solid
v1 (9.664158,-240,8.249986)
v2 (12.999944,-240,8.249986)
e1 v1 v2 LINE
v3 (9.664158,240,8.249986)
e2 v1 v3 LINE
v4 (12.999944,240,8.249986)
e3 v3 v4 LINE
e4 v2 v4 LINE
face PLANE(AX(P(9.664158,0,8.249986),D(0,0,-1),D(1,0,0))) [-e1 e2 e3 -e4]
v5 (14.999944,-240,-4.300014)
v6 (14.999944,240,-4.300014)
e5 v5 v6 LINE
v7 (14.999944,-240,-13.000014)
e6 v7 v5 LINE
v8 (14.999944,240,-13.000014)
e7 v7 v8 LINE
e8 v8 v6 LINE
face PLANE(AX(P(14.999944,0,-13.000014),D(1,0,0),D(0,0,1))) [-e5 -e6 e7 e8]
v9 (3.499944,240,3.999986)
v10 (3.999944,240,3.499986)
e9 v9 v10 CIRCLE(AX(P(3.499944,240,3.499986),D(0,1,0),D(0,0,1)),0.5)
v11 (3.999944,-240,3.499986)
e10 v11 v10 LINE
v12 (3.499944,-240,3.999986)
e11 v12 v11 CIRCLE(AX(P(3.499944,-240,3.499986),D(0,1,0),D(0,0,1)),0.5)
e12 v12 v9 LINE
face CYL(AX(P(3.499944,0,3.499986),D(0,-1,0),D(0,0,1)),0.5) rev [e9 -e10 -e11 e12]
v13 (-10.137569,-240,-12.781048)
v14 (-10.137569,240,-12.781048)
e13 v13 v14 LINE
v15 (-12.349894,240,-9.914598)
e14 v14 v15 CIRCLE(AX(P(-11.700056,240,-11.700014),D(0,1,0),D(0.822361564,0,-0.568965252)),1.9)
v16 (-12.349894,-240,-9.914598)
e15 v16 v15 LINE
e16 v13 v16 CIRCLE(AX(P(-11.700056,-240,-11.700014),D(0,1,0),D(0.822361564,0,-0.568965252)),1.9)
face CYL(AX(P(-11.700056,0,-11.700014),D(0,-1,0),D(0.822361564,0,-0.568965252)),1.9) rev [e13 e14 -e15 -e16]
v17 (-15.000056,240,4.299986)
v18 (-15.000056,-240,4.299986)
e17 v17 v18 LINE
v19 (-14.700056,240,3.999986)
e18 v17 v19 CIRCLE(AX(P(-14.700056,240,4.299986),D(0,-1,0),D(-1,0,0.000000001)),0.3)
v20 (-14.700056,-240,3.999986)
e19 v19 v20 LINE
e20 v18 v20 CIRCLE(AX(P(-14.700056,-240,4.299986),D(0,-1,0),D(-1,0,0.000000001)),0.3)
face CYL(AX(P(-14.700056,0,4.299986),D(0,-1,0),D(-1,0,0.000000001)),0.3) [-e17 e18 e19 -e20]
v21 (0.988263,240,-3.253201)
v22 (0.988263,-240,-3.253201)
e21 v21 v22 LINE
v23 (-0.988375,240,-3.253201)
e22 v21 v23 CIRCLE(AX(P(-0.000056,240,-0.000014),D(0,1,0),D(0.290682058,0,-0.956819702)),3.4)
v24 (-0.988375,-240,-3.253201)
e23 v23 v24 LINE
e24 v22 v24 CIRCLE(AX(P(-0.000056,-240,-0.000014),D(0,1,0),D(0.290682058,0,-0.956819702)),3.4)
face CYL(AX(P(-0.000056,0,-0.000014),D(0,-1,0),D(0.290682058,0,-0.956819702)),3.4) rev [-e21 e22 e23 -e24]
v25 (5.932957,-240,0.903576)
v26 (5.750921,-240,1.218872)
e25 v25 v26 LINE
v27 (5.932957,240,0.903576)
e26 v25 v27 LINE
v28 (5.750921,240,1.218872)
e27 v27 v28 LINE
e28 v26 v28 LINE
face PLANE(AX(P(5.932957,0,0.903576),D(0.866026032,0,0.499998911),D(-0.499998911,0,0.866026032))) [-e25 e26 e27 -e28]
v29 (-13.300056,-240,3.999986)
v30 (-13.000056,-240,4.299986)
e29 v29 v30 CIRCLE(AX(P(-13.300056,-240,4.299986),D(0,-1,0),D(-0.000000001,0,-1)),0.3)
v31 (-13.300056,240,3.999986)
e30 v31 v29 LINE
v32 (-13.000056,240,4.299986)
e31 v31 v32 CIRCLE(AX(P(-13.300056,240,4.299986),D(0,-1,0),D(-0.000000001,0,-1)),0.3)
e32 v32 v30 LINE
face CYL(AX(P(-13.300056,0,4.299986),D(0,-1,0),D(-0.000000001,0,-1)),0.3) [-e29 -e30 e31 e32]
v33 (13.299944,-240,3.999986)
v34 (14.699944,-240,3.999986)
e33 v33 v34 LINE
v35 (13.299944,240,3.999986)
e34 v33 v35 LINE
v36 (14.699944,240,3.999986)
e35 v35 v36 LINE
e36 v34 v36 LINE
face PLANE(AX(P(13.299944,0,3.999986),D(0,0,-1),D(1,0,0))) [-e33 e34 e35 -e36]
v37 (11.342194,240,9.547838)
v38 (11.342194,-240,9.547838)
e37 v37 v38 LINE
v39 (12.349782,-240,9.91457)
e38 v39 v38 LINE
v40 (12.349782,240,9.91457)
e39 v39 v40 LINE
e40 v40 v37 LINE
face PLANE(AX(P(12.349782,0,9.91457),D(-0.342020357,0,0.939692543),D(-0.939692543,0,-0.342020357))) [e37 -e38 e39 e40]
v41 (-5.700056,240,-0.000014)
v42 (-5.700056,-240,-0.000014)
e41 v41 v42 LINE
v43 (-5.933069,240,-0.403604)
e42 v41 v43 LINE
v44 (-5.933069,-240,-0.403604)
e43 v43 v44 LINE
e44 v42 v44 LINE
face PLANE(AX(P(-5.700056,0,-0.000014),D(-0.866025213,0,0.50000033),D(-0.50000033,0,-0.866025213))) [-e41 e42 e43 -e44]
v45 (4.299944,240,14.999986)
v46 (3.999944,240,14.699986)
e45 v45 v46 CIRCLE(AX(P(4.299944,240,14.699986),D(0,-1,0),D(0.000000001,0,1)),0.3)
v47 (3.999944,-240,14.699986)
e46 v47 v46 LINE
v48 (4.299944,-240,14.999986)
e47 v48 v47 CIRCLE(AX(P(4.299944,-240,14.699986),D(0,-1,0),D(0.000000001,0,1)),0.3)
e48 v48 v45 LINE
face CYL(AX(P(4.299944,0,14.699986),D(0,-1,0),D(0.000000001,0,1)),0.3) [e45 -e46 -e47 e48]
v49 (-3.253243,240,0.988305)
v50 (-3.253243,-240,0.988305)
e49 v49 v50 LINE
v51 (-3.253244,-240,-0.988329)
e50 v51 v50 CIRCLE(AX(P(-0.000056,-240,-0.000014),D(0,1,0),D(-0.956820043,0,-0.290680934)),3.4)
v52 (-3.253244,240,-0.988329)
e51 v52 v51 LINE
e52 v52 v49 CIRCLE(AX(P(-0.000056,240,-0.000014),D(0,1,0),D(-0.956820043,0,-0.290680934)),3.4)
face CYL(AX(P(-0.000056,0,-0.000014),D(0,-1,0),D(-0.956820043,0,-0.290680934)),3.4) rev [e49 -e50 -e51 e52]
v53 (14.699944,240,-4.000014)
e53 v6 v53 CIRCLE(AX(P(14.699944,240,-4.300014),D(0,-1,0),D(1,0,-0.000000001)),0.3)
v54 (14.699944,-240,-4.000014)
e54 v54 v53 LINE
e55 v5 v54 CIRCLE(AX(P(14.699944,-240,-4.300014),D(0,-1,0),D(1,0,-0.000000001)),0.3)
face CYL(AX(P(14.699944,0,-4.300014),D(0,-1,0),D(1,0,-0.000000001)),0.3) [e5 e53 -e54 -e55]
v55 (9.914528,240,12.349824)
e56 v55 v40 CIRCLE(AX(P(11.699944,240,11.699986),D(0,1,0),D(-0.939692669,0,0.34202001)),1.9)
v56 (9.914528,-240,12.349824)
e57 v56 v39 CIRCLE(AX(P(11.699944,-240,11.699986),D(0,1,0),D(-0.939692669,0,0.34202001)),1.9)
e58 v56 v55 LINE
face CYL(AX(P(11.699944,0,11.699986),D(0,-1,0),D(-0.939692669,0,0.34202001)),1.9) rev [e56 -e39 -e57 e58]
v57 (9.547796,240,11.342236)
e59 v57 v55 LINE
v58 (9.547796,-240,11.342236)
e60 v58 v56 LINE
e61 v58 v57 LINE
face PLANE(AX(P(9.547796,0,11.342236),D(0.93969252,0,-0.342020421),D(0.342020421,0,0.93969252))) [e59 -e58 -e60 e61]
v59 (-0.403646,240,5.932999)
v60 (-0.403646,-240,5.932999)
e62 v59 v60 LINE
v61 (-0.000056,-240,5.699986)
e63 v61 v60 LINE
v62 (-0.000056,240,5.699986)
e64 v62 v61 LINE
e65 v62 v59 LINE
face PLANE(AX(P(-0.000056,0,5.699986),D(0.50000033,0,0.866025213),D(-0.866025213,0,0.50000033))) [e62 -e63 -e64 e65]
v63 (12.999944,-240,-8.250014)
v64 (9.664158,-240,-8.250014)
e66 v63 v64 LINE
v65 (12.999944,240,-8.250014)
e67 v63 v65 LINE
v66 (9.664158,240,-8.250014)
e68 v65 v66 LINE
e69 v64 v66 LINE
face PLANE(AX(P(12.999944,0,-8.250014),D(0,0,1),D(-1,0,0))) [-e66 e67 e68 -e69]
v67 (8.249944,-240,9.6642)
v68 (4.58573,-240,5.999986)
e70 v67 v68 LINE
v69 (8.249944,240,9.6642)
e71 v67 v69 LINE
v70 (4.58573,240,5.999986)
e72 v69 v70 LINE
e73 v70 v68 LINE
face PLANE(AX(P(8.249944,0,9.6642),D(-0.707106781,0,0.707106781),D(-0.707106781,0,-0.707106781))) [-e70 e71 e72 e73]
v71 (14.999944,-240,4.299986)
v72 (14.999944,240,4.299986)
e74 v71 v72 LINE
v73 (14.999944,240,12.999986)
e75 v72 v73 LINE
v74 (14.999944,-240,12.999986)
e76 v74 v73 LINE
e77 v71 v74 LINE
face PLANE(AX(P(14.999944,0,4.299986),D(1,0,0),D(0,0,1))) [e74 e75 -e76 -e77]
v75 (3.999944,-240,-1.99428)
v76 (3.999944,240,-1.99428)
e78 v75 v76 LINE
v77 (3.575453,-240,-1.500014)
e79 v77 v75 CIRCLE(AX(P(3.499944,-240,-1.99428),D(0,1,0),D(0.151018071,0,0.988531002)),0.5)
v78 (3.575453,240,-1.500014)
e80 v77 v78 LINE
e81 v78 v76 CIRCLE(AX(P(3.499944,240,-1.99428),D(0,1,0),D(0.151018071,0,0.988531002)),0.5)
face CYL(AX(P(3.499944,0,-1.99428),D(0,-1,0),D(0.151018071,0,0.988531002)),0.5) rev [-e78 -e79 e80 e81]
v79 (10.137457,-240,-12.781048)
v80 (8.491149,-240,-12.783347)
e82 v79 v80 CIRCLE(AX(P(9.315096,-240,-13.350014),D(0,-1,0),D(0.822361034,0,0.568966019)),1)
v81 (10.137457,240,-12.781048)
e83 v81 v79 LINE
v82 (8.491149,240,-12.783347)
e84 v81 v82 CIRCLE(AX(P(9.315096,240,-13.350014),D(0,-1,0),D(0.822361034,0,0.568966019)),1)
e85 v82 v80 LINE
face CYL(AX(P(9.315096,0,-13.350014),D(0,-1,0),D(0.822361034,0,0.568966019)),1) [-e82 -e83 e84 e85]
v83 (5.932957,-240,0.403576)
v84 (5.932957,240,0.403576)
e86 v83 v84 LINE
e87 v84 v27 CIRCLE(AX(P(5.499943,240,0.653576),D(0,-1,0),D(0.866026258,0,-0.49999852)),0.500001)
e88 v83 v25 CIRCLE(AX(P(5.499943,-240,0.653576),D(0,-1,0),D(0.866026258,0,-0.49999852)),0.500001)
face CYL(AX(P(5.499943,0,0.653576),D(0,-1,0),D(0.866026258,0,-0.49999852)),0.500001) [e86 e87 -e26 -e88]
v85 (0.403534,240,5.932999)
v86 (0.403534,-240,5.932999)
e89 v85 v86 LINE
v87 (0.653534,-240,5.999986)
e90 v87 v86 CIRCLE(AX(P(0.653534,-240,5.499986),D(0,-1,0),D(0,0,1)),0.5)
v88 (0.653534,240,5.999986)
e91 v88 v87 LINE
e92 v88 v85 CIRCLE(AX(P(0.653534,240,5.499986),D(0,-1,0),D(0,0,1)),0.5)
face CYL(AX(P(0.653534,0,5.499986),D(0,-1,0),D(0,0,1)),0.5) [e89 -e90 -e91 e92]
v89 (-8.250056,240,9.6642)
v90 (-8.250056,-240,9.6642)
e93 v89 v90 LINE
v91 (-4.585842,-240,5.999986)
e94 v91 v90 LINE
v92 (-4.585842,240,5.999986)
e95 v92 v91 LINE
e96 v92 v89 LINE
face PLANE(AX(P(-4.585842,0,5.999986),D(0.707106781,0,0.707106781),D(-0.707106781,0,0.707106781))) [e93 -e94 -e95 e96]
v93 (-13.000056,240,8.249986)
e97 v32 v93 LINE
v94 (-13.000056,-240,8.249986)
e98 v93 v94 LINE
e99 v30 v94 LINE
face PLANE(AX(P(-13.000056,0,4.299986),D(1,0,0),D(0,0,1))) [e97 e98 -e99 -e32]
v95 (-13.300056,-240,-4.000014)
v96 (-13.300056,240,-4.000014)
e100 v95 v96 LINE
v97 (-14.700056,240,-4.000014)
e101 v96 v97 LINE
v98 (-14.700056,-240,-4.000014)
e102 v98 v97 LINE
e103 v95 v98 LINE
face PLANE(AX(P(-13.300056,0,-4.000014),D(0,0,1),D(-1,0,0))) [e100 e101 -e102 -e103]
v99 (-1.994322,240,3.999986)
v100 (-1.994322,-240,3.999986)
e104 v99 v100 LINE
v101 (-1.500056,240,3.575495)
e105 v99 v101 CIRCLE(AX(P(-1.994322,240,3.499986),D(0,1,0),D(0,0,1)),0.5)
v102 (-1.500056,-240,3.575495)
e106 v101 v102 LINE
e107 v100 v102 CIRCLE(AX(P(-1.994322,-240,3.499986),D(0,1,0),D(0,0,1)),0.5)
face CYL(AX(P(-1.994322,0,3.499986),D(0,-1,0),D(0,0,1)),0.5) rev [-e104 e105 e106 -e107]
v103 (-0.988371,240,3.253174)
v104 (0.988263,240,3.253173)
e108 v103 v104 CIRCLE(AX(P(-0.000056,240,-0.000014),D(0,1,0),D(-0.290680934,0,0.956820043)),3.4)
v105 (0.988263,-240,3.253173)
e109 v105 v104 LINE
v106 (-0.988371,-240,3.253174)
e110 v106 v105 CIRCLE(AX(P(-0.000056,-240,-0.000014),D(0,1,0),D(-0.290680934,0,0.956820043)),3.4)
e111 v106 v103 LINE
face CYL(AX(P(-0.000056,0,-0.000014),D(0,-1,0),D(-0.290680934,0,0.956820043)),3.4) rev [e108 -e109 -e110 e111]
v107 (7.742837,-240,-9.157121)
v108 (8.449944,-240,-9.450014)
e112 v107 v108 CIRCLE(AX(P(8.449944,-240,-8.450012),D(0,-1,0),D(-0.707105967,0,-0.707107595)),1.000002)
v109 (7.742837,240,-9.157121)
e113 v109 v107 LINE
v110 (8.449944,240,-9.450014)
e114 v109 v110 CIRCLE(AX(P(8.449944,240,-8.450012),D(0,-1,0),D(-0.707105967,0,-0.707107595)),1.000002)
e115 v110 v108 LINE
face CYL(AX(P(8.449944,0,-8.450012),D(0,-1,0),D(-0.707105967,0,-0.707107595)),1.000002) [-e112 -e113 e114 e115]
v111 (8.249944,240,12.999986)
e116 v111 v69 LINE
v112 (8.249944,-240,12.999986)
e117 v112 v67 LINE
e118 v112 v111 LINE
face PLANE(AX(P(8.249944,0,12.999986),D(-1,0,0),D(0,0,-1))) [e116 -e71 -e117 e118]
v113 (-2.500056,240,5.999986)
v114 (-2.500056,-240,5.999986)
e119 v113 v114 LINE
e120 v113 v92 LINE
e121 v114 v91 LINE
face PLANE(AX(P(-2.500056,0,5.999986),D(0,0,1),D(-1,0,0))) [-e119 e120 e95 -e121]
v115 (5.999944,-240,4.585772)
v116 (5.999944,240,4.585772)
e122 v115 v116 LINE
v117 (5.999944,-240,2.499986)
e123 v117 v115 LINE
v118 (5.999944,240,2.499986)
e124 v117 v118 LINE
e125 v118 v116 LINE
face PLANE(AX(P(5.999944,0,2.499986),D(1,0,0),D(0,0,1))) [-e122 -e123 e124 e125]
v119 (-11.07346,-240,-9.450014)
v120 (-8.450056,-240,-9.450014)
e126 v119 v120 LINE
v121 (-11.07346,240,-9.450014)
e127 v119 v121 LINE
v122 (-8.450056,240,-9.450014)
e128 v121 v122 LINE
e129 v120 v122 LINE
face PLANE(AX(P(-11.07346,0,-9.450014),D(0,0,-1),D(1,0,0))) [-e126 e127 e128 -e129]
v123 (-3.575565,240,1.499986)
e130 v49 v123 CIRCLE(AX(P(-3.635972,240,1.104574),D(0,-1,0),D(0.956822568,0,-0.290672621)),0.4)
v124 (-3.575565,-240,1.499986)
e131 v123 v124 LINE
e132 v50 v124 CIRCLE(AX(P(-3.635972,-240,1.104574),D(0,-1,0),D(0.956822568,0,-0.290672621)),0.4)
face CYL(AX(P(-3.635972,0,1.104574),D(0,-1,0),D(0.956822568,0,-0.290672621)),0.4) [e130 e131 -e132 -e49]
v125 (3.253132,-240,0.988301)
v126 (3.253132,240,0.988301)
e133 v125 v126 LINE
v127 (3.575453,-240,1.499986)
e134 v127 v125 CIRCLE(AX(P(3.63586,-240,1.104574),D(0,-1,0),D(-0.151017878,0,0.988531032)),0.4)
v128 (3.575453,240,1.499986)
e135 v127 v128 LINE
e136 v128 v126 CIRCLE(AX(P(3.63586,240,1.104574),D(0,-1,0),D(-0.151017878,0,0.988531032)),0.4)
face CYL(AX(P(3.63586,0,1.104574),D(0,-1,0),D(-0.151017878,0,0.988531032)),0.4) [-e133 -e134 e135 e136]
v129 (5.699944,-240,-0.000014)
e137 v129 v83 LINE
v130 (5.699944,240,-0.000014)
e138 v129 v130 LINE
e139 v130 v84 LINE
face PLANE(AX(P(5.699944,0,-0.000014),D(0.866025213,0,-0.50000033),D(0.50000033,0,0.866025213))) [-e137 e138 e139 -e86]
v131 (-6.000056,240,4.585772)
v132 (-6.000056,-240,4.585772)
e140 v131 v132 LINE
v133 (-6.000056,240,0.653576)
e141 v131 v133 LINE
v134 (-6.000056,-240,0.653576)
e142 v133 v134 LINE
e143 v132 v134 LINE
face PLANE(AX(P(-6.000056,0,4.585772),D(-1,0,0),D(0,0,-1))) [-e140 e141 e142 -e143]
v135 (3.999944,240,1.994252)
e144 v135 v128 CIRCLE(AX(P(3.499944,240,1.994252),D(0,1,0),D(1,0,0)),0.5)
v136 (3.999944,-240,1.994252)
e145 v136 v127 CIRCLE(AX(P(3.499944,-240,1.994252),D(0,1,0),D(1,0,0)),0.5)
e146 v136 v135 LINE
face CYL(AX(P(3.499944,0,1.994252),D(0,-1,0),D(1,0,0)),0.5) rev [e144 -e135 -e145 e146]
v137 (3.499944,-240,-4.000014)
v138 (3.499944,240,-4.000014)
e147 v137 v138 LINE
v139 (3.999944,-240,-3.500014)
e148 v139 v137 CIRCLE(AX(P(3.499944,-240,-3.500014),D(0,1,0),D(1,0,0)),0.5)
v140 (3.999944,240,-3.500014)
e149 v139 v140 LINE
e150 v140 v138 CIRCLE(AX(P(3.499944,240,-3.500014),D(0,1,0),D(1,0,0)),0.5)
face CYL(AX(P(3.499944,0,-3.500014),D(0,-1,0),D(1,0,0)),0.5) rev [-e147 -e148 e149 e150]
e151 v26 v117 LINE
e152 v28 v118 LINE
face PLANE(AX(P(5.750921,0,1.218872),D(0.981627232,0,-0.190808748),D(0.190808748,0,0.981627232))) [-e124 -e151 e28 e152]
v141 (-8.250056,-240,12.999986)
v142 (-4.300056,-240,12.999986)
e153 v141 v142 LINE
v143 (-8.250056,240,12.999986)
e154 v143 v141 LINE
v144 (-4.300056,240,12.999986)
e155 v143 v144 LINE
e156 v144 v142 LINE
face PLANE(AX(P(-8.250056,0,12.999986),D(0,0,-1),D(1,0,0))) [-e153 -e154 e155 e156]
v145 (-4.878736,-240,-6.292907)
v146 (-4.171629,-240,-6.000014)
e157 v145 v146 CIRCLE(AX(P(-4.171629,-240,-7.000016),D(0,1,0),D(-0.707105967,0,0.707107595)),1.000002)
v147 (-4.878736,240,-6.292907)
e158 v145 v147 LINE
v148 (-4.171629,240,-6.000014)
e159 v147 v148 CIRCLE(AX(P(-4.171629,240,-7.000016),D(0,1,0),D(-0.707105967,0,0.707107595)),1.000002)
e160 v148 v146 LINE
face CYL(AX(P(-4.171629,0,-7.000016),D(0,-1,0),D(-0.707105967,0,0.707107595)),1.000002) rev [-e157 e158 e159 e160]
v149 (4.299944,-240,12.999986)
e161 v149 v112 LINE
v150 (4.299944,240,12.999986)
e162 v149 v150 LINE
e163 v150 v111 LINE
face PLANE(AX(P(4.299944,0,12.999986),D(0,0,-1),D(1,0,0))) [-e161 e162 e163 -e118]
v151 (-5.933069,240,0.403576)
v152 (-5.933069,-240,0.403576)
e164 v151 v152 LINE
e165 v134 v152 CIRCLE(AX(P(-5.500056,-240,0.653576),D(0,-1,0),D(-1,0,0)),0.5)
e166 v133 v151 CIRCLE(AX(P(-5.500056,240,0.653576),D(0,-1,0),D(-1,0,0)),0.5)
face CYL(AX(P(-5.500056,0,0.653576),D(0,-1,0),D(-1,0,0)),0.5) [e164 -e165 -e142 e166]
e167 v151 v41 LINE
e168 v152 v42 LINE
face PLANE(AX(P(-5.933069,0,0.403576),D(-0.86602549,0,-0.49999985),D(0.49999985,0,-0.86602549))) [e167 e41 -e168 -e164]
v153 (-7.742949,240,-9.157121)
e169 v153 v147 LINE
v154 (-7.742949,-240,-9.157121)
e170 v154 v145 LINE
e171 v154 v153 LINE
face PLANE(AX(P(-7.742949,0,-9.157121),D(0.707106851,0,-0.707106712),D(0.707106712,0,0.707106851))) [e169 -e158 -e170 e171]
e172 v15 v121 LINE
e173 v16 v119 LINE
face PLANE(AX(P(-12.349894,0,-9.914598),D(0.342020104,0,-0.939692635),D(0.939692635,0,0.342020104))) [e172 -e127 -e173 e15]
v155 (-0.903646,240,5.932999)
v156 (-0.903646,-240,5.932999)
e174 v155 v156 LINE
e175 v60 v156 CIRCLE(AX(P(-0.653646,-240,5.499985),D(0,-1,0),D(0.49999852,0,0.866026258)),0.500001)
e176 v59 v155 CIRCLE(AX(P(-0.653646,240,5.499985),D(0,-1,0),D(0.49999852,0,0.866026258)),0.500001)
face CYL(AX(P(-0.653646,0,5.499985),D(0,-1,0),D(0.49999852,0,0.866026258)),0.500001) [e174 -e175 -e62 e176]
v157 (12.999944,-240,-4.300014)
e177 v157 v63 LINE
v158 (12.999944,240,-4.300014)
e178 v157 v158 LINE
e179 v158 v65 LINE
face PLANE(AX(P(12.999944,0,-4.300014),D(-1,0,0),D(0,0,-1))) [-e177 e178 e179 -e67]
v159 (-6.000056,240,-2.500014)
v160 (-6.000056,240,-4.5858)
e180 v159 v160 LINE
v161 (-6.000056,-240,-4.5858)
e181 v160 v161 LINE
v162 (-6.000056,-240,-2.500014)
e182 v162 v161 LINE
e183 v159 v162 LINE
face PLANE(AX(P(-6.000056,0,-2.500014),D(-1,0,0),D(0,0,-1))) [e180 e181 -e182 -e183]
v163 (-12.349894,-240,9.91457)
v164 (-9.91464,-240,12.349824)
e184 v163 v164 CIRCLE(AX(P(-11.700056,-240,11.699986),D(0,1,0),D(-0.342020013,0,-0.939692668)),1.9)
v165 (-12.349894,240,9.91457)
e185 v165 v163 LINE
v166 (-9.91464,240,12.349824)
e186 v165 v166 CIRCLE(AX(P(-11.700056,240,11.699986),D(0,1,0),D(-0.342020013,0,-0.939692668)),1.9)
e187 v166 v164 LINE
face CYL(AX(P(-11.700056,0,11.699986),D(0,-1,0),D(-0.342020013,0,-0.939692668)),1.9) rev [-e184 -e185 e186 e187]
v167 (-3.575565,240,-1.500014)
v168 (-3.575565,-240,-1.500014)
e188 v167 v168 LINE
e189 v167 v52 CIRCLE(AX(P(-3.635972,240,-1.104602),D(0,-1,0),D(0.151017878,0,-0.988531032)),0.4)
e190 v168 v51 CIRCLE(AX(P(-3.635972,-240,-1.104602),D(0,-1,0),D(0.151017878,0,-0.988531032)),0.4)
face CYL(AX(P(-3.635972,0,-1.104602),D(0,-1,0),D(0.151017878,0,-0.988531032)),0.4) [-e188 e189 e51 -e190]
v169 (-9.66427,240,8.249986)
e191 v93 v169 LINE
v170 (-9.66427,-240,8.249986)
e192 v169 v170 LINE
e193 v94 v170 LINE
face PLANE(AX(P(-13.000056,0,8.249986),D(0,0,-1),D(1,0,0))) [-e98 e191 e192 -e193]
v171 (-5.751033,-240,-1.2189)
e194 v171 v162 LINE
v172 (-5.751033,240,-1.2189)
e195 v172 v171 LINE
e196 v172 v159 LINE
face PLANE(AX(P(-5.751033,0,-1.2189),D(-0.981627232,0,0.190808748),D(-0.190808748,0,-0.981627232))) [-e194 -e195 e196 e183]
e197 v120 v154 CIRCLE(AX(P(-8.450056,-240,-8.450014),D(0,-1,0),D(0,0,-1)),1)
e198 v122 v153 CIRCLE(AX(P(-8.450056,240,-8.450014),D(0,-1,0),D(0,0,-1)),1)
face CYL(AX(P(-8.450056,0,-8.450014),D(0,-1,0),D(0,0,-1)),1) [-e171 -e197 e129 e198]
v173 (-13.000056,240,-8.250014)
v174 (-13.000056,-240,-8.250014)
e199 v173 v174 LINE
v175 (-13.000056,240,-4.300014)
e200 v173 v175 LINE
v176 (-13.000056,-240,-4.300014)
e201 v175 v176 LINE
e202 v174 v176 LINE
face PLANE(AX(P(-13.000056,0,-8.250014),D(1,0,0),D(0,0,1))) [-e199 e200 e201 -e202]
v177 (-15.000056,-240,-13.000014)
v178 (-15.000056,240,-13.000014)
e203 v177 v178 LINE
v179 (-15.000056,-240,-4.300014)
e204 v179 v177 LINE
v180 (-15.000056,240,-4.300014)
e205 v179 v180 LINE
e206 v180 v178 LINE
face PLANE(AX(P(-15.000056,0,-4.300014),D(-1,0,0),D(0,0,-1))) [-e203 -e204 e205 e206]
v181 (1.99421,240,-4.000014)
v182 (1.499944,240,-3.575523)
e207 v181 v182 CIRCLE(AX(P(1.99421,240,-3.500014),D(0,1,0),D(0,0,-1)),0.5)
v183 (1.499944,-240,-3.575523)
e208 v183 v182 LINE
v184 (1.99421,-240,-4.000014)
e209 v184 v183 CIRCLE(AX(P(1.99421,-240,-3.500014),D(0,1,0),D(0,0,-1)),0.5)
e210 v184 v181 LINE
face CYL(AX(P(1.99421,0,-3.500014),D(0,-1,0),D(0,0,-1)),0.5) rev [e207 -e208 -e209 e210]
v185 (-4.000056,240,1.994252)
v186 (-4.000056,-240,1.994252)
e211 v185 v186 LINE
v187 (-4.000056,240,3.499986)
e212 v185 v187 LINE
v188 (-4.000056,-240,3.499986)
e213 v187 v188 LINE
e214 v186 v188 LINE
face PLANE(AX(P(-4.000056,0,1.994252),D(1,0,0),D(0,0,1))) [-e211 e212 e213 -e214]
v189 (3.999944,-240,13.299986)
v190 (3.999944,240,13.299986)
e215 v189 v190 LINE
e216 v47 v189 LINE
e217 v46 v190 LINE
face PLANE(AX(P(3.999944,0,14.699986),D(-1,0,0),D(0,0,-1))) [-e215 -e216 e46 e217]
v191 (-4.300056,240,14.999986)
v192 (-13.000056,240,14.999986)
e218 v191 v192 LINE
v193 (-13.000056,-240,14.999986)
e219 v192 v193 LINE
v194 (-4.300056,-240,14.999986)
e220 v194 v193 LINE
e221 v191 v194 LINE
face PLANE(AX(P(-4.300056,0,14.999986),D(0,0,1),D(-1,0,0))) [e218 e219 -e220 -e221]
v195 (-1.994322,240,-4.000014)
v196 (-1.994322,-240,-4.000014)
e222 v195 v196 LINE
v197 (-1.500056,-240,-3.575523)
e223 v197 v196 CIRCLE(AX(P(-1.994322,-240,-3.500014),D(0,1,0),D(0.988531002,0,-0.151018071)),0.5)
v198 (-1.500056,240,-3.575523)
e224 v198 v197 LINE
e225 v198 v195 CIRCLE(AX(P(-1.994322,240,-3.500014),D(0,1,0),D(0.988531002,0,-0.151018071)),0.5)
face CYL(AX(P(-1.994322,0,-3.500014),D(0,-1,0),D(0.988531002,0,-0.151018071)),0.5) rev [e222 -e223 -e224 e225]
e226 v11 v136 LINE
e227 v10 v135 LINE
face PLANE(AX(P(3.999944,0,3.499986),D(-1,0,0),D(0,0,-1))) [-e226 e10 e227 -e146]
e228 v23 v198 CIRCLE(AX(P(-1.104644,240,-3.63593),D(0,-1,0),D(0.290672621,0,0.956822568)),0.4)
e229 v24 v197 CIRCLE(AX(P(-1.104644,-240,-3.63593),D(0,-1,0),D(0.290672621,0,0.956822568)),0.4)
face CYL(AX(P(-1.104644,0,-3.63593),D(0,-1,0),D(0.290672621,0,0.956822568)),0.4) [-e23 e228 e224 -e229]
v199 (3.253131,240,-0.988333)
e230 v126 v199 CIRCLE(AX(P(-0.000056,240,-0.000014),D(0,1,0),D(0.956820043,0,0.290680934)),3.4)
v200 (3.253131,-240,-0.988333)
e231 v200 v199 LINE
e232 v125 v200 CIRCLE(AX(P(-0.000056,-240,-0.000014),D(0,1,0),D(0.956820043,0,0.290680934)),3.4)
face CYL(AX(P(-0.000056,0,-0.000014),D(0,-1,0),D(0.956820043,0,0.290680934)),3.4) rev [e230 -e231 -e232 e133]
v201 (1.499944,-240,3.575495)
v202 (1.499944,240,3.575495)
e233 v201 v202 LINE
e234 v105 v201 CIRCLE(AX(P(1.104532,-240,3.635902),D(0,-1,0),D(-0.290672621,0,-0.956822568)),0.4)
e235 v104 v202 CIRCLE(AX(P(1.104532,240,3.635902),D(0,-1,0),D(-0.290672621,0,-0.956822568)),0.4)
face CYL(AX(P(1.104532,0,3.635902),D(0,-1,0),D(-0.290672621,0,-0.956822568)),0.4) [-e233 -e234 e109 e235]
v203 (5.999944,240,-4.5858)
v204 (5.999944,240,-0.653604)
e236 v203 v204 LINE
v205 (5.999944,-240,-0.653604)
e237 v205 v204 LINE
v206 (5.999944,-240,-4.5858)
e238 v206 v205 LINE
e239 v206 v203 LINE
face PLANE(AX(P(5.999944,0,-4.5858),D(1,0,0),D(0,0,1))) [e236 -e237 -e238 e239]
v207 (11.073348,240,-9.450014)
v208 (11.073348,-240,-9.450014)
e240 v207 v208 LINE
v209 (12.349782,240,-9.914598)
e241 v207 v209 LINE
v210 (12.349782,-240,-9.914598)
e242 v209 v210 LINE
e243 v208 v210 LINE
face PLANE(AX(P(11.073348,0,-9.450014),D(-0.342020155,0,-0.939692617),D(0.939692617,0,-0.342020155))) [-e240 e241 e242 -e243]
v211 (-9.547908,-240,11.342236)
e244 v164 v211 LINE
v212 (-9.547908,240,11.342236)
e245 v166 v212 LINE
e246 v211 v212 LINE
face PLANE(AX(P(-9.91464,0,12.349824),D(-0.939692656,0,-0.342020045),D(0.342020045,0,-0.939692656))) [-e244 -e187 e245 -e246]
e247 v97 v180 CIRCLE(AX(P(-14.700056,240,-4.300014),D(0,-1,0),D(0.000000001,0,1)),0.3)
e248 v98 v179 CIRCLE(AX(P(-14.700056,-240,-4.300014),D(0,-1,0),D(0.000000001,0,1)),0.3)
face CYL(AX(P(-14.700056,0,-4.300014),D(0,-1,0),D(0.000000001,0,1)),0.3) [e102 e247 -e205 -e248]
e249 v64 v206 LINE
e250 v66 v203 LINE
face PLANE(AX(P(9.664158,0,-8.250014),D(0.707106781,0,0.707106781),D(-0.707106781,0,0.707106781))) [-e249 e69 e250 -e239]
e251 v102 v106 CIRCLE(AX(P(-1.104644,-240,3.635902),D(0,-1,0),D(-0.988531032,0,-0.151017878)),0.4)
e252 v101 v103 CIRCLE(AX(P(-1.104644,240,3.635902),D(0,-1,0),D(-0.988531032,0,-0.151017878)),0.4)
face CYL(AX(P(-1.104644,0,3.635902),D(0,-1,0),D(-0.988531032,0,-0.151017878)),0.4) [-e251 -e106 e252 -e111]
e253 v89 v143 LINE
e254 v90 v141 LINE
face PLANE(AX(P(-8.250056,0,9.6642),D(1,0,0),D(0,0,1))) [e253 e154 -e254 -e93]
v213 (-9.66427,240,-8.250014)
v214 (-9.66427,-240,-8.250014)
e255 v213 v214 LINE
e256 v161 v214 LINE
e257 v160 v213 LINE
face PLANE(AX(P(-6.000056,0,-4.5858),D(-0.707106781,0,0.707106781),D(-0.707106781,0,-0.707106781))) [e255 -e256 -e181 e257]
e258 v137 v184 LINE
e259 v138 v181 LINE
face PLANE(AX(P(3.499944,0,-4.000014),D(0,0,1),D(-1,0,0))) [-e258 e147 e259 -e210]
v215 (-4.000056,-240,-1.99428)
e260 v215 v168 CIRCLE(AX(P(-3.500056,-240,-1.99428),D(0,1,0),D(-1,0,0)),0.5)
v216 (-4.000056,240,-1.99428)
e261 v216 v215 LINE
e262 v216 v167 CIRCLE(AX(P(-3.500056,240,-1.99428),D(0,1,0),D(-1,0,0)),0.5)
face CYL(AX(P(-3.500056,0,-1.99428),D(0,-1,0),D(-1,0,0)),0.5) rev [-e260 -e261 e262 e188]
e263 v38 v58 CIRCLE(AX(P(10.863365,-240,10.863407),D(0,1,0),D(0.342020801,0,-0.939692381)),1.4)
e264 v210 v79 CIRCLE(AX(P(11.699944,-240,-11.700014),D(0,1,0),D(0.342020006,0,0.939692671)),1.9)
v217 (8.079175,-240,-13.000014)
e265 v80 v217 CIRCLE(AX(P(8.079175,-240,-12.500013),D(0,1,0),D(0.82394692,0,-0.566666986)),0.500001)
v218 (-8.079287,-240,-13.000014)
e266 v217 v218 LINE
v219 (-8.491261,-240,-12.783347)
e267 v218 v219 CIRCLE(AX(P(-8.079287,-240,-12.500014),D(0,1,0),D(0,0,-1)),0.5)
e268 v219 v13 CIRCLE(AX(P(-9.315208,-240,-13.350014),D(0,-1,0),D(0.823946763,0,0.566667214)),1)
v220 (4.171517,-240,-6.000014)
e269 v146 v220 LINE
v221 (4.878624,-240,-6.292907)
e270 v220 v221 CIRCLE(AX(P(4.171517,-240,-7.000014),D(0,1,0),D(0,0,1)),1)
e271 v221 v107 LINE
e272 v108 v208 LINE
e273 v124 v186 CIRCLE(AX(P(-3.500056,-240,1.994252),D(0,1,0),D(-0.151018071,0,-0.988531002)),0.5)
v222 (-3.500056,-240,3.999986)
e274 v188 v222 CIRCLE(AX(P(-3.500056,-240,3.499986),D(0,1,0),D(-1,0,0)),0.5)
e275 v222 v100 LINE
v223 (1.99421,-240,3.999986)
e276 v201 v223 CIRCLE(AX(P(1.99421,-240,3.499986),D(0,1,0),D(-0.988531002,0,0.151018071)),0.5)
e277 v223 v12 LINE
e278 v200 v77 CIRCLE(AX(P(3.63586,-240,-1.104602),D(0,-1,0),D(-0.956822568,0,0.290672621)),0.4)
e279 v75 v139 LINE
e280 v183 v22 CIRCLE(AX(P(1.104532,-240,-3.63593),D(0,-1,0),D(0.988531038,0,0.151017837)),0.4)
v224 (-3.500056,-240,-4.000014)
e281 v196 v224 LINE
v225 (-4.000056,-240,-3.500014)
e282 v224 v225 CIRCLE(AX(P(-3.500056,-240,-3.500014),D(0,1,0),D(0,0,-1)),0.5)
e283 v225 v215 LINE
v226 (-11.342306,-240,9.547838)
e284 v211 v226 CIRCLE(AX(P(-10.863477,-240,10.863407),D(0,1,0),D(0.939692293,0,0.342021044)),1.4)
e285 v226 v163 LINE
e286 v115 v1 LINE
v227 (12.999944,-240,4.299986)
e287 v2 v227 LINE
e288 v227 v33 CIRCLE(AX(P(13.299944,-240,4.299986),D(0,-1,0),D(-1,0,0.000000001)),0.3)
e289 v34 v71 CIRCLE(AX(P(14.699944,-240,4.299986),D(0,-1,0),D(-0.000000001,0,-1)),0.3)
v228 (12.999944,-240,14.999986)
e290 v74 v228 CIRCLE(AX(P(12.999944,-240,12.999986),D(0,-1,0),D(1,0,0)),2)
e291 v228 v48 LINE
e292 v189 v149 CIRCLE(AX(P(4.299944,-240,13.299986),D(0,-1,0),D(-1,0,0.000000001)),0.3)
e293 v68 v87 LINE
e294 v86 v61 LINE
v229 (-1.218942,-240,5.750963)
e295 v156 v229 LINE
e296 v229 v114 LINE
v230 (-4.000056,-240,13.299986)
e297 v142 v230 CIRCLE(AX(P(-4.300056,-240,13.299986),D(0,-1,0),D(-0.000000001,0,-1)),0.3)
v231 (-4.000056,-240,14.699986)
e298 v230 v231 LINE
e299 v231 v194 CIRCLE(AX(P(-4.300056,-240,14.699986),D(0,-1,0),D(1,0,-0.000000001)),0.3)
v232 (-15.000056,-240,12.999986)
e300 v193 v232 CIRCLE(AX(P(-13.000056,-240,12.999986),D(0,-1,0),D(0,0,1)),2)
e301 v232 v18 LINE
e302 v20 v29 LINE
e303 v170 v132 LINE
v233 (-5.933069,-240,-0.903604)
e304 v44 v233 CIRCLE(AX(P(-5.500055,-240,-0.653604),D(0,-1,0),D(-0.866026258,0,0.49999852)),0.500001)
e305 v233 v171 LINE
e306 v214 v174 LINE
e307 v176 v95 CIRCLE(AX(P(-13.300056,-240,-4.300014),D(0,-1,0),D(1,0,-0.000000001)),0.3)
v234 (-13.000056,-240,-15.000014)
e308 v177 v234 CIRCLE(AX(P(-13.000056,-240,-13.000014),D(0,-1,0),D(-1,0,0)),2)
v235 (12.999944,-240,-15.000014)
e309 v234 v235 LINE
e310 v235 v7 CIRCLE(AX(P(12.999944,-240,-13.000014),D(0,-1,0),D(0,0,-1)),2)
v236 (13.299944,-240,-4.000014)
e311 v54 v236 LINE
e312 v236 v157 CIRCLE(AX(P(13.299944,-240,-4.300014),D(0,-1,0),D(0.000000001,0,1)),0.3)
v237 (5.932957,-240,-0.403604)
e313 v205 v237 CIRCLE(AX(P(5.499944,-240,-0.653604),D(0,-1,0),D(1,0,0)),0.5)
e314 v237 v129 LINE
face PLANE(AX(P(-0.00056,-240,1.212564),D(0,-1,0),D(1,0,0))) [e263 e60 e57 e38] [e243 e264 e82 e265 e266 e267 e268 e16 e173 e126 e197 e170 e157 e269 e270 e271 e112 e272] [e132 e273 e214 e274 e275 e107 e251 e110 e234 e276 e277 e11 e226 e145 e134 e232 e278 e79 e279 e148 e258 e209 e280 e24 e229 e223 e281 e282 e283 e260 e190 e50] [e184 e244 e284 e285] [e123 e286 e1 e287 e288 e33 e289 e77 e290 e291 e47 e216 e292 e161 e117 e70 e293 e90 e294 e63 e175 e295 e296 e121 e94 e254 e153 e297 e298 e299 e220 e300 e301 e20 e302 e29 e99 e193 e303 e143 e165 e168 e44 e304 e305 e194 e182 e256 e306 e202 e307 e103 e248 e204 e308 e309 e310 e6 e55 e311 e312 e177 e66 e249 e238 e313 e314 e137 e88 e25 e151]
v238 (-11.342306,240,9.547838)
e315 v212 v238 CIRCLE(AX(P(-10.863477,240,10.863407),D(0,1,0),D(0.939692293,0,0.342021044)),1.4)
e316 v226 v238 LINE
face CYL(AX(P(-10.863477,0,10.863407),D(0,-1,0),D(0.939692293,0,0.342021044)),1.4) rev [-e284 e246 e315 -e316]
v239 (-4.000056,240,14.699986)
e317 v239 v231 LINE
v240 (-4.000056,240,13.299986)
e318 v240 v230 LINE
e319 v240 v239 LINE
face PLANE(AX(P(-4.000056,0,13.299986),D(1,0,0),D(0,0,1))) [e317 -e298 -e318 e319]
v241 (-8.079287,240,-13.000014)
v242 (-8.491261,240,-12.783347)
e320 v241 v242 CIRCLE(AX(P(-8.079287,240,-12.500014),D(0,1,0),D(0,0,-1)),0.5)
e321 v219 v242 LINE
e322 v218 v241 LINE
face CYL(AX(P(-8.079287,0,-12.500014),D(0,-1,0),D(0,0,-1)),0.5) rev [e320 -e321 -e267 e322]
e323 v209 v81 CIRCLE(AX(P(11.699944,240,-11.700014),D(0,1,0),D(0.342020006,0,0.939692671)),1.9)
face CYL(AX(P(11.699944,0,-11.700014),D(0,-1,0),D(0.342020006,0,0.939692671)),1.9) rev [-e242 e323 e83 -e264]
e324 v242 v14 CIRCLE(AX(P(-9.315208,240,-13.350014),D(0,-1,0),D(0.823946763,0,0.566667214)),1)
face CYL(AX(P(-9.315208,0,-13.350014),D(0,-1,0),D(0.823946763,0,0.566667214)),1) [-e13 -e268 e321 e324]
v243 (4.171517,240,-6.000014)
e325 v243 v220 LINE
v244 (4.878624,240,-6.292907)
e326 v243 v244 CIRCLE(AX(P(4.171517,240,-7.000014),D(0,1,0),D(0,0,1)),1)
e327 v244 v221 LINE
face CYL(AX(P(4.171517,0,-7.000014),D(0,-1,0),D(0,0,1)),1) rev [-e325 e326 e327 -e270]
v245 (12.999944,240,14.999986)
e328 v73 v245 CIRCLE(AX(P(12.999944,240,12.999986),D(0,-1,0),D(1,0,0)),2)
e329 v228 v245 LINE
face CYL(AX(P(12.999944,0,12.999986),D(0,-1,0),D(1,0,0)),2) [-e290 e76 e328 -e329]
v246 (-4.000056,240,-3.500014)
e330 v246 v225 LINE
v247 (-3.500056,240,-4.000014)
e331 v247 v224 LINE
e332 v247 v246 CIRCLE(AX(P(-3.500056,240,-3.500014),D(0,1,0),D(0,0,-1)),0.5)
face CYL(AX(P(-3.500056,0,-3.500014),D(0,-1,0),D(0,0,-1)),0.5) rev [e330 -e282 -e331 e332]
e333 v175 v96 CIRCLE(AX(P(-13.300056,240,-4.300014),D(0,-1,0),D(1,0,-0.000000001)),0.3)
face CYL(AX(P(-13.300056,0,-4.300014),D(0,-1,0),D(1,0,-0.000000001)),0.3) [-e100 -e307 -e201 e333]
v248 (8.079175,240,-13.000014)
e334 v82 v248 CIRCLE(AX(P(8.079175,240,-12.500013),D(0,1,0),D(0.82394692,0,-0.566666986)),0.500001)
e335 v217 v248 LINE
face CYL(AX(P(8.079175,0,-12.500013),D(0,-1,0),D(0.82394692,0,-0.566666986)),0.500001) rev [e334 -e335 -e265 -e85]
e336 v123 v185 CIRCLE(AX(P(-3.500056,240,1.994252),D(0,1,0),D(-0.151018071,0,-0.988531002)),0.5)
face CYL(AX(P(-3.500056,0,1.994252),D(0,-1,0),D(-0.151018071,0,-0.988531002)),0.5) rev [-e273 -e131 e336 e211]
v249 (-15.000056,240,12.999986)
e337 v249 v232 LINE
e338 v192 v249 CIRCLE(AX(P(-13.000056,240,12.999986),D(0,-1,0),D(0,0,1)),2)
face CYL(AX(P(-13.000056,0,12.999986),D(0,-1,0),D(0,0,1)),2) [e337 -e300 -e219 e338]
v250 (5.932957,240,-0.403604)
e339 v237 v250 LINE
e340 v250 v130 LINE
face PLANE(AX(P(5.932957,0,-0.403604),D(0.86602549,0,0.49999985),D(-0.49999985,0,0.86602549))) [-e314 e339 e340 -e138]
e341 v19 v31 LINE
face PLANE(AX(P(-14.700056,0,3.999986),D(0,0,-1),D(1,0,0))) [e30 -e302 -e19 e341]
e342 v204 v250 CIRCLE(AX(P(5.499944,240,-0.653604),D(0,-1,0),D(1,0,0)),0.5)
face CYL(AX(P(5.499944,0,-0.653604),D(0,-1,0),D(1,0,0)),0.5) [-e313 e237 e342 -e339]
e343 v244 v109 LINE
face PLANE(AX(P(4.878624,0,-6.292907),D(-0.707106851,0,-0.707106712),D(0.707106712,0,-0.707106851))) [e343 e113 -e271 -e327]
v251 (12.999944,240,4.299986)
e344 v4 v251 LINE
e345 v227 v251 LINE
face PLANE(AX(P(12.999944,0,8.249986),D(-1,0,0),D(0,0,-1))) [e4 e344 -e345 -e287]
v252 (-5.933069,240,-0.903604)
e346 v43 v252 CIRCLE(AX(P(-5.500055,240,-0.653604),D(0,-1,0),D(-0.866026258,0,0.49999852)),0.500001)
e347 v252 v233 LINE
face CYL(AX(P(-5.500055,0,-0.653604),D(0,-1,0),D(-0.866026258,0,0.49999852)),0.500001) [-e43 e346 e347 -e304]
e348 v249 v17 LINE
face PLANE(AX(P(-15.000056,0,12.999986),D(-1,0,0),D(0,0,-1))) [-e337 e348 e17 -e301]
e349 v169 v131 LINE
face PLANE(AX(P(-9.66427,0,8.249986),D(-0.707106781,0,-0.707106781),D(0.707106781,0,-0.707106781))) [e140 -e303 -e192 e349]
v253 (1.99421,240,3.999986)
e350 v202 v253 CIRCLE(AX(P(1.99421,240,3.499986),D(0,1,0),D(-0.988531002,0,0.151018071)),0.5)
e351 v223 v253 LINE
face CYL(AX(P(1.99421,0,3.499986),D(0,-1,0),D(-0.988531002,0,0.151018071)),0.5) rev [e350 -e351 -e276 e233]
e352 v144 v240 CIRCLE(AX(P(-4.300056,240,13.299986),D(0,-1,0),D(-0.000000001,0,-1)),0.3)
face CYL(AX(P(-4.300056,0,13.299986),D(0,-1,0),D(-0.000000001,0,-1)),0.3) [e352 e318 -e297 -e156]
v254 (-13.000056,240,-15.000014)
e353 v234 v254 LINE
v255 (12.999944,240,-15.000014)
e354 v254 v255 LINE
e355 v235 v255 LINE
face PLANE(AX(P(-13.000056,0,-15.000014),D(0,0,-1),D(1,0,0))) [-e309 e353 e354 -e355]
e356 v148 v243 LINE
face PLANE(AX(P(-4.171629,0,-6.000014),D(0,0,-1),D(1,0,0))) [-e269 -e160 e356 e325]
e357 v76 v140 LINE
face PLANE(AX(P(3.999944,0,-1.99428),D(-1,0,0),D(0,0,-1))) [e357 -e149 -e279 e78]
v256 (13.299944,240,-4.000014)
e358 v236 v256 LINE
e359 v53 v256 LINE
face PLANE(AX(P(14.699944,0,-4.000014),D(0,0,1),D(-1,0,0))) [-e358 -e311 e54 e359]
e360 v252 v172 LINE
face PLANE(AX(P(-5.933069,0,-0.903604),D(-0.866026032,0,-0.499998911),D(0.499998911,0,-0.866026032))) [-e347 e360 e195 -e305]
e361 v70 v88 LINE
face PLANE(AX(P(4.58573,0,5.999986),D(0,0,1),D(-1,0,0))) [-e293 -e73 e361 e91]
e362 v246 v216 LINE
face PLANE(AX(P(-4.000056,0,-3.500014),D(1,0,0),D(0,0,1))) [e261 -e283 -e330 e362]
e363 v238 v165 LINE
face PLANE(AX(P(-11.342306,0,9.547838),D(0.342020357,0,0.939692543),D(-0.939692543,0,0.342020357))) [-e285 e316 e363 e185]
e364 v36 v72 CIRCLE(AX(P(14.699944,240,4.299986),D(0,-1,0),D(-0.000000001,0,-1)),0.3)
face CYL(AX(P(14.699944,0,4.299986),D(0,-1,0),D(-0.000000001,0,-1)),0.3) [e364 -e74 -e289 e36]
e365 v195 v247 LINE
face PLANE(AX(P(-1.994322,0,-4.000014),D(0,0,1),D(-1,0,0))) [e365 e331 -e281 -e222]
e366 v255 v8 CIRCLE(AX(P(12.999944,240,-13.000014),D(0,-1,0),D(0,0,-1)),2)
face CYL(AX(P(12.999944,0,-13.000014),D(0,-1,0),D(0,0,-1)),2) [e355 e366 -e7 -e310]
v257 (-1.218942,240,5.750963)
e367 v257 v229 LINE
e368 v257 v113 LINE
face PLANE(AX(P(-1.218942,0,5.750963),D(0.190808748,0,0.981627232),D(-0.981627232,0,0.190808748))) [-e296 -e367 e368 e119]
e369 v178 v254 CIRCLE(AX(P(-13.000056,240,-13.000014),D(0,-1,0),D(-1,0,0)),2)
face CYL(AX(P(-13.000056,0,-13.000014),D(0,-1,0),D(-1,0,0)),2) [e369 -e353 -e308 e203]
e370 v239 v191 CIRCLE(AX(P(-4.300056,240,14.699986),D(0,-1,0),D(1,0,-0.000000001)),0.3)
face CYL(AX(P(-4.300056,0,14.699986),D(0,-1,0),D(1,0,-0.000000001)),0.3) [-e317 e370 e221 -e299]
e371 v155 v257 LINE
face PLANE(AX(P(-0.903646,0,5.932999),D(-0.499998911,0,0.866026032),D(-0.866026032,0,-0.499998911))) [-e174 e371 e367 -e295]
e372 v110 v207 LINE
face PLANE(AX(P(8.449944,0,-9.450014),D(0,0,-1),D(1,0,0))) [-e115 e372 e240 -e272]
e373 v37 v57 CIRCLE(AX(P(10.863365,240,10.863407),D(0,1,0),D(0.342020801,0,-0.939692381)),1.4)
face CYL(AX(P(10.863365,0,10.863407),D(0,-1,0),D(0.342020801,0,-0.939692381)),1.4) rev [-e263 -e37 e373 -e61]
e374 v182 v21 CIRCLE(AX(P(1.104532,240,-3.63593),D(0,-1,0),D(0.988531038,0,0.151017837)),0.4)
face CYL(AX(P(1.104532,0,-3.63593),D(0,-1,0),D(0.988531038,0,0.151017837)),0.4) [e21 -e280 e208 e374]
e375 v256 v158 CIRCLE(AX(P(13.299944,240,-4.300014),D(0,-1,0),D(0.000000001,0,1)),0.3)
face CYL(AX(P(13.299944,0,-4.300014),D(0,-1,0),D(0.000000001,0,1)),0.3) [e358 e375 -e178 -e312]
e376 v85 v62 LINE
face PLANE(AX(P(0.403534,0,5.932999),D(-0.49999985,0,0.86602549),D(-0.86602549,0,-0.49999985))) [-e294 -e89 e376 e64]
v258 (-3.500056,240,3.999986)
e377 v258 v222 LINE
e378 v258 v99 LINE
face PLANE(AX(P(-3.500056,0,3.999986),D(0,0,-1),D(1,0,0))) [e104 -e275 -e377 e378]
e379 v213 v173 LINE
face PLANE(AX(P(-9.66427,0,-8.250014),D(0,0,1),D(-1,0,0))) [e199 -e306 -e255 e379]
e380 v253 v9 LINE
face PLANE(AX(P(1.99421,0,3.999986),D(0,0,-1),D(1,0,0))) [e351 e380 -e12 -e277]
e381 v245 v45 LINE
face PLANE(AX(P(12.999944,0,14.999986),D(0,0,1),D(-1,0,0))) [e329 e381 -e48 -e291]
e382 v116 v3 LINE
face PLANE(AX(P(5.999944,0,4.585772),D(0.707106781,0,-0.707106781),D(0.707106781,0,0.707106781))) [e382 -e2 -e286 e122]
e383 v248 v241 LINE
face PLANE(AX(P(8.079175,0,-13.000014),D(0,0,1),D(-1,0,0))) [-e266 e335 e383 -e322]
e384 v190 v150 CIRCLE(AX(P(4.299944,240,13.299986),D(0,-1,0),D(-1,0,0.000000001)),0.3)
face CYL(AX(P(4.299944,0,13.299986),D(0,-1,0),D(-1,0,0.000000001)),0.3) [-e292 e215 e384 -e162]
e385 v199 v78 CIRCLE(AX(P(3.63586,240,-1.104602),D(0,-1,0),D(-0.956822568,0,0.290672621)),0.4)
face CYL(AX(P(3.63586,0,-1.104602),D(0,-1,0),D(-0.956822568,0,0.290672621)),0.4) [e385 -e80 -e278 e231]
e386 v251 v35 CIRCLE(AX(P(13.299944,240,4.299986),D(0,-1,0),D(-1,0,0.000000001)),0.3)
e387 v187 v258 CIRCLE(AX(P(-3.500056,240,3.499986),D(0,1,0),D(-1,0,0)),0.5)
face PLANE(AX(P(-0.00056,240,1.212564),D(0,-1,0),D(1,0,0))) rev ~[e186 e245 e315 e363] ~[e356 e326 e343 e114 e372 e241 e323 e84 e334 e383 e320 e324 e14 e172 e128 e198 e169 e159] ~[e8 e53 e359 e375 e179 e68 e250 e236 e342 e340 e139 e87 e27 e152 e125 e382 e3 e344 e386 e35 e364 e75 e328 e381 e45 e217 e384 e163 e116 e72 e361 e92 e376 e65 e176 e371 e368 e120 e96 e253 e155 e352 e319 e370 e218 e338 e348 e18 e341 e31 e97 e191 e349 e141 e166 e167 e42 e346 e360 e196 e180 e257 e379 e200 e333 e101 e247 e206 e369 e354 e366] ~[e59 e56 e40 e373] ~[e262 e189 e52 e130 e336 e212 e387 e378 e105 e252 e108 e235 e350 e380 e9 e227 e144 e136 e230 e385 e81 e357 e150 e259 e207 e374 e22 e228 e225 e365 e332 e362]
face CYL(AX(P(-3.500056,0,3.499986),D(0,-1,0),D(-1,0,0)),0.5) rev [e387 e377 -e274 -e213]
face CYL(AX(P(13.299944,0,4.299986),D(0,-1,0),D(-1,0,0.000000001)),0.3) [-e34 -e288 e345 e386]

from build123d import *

# Parameters (mm, degrees)
F2_DEPTH = 240


# Not quite as in the source:
# - ends of sketch curves that miss each other by under 0.0002 mm in the source are joined


with BuildPart() as f2:
    # F1 (on Front) → F2 (new body, symmetric)
    with BuildSketch(Plane.XZ):
        with BuildLine():
            Line((8.249944, 9.6642), (4.58573, 5.999986))
            Line((4.58573, 5.999986), (0.653534, 5.999986))
            ThreePointArc((0.653534, 5.999986), (0.5241245494, 5.9829489324), (0.4035341291, 5.9329987764))
            Line((0.4035341291, 5.9329987764), (-5.6e-05, 5.699986))
            Line((-5.6e-05, 5.699986), (-0.403646, 5.932999))
            ThreePointArc((-0.403646, 5.932999), (-0.653646, 5.999986), (-0.9036458709, 5.9329987764))
            Line((-0.9036458709, 5.9329987764), (-1.218942, 5.750963))
            Line((-1.218942, 5.750963), (-2.500056, 5.999986))
            Line((-2.500056, 5.999986), (-4.585842, 5.999986))
            Line((-4.585842, 5.999986), (-8.250056, 9.6642))
            Line((-8.250056, 9.6642), (-8.250056, 12.999986))
            Line((-8.250056, 12.999986), (-4.300056, 12.999986))
            ThreePointArc((-4.300056, 12.999986), (-4.0879239656, 13.0878539656), (-4.000056, 13.299986))
            Line((-4.000056, 13.299986), (-4.000056, 14.699986))
            ThreePointArc((-4.000056, 14.699986), (-4.0879239656, 14.9121180344), (-4.300056, 14.999986))
            Line((-4.300056, 14.999986), (-13.000056, 14.999986))
            ThreePointArc((-13.000056, 14.999986), (-14.4142695624, 14.4141995624), (-15.000056, 12.999986))
            Line((-15.000056, 12.999986), (-15.000056, 4.299986))
            ThreePointArc((-15.000056, 4.299986), (-14.9121880344, 4.0878539656), (-14.700056, 3.999986))
            Line((-14.700056, 3.999986), (-13.300056, 3.999986))
            ThreePointArc((-13.300056, 3.999986), (-13.0879239656, 4.0878539656), (-13.000056, 4.299986))
            Line((-13.000056, 4.299986), (-13.000056, 8.249986))
            Line((-13.000056, 8.249986), (-9.66427, 8.249986))
            Line((-9.66427, 8.249986), (-6.000056, 4.585772))
            Line((-6.000056, 4.585772), (-6.000056, 0.653576))
            ThreePointArc((-6.000056, 0.653576), (-5.9830189324, 0.5241665494), (-5.9330687764, 0.4035761291))
            Line((-5.9330687764, 0.4035761291), (-5.700056, -1.4e-05))
            Line((-5.700056, -1.4e-05), (-5.933069, -0.403604))
            ThreePointArc((-5.933069, -0.403604), (-6.000056, -0.653604), (-5.9330687764, -0.9036038709))
            Line((-5.9330687764, -0.9036038709), (-5.751033, -1.2189))
            Line((-5.751033, -1.2189), (-6.000056, -2.500014))
            Line((-6.000056, -2.500014), (-6.000056, -4.5858))
            Line((-6.000056, -4.5858), (-9.66427, -8.250014))
            Line((-9.66427, -8.250014), (-13.000056, -8.250014))
            Line((-13.000056, -8.250014), (-13.000056, -4.300014))
            ThreePointArc((-13.000056, -4.300014), (-13.0879239656, -4.0878819656), (-13.300056, -4.000014))
            Line((-13.300056, -4.000014), (-14.700056, -4.000014))
            ThreePointArc((-14.700056, -4.000014), (-14.9121880344, -4.0878819656), (-15.000056, -4.300014))
            Line((-15.000056, -4.300014), (-15.000056, -13.000014))
            ThreePointArc((-15.000056, -13.000014), (-14.4142695624, -14.4142275624), (-13.000056, -15.000014))
            Line((-13.000056, -15.000014), (12.999944, -15.000014))
            ThreePointArc((12.999944, -15.000014), (14.4141575624, -14.4142275624), (14.999944, -13.000014))
            Line((14.999944, -13.000014), (14.999944, -4.300014))
            ThreePointArc((14.999944, -4.300014), (14.9120760344, -4.0878819656), (14.699944, -4.000014))
            Line((14.699944, -4.000014), (13.299944, -4.000014))
            ThreePointArc((13.299944, -4.000014), (13.0878119656, -4.0878819656), (12.999944, -4.300014))
            Line((12.999944, -4.300014), (12.999944, -8.250014))
            Line((12.999944, -8.250014), (9.664158, -8.250014))
            Line((9.664158, -8.250014), (5.999944, -4.5858))
            Line((5.999944, -4.5858), (5.999944, -0.653604))
            ThreePointArc((5.999944, -0.653604), (5.9829069324, -0.5241945494), (5.9329567764, -0.4036041291))
            Line((5.9329567764, -0.4036041291), (5.699944, -1.4e-05))
            Line((5.699944, -1.4e-05), (5.932957, 0.403576))
            ThreePointArc((5.932957, 0.403576), (5.999944, 0.653576), (5.9329567764, 0.9035758709))
            Line((5.9329567764, 0.9035758709), (5.750921, 1.218872))
            Line((5.750921, 1.218872), (5.999944, 2.499986))
            Line((5.999944, 2.499986), (5.999944, 4.585772))
            Line((5.999944, 4.585772), (9.664158, 8.249986))
            Line((9.664158, 8.249986), (12.999944, 8.249986))
            Line((12.999944, 8.249986), (12.999944, 4.299986))
            ThreePointArc((12.999944, 4.299986), (13.0878119656, 4.0878539656), (13.299944, 3.999986))
            Line((13.299944, 3.999986), (14.699944, 3.999986))
            ThreePointArc((14.699944, 3.999986), (14.9120760344, 4.0878539656), (14.999944, 4.299986))
            Line((14.999944, 4.299986), (14.999944, 12.999986))
            ThreePointArc((14.999944, 12.999986), (14.4141575624, 14.4141995624), (12.999944, 14.999986))
            Line((12.999944, 14.999986), (4.299944, 14.999986))
            ThreePointArc((4.299944, 14.999986), (4.0878119656, 14.9121180344), (3.999944, 14.699986))
            Line((3.999944, 14.699986), (3.999944, 13.299986))
            ThreePointArc((3.999944, 13.299986), (4.0878119656, 13.0878539656), (4.299944, 12.999986))
            Line((4.299944, 12.999986), (8.249944, 12.999986))
            Line((8.249944, 12.999986), (8.249944, 9.6642))
        make_face()
        with BuildLine():
            Line((-4.171629, -6.000014), (4.171517, -6.000014))
            ThreePointArc((4.171517, -6.000014), (4.5542004324, -6.0761344675), (4.8786237812, -6.2929072188))
            Line((4.8786237812, -6.2929072188), (7.742837, -9.157121))
            ThreePointArc((7.742837, -9.157121), (8.0672605676, -9.3738935325), (8.449944, -9.450014))
            Line((8.449944, -9.450014), (11.073348, -9.450014))
            Line((11.073348, -9.450014), (12.349782, -9.914598))
            ThreePointArc((12.349782, -9.914598), (13.2040603505, -12.8608903949), (10.1374570291, -12.7810479799))
            ThreePointArc((10.1374570291, -12.7810479799), (9.3136995047, -12.3500149751), (8.4911490608, -12.7833470418))
            ThreePointArc((8.4911490608, -12.7833470418), (8.3119125635, -12.9425444809), (8.079175, -13.000014))
            Line((8.079175, -13.000014), (-8.079287, -13.000014))
            ThreePointArc((-8.079287, -13.000014), (-8.3120245635, -12.9425444809), (-8.4912608636, -12.7833469062))
            ThreePointArc((-8.4912608636, -12.7833469062), (-9.3138115047, -12.3500149751), (-10.1375690315, -12.7810479782))
            ThreePointArc((-10.1375690315, -12.7810479782), (-13.2041723505, -12.8608903949), (-12.3498940253, -9.9145979306))
            Line((-12.3498940253, -9.9145979306), (-11.07346, -9.450014))
            Line((-11.07346, -9.450014), (-8.450056, -9.450014))
            ThreePointArc((-8.450056, -9.450014), (-8.0673725676, -9.3738935325), (-7.7429492188, -9.1571207812))
            Line((-7.7429492188, -9.1571207812), (-4.878736, -6.292907))
            ThreePointArc((-4.878736, -6.292907), (-4.5543124324, -6.0761344675), (-4.171629, -6.000014))
        make_face(mode=Mode.SUBTRACT)
        with BuildLine():
            ThreePointArc((-12.3498940253, 9.9145699306), (-13.0435588843, 13.0434888843), (-9.9146399306, 12.3498240253))
            Line((-9.9146399306, 12.3498240253), (-9.547908, 11.342236))
            ThreePointArc((-9.547908, 11.342236), (-9.8735275063, 9.8734575063), (-11.3423061215, 9.5478376661))
            Line((-11.3423061215, 9.5478376661), (-12.3498940253, 9.9145699306))
        make_face(mode=Mode.SUBTRACT)
        with BuildLine():
            ThreePointArc((0.9882629956, -3.2532009855), (-5.6e-05, -3.400014), (-0.9883749956, -3.2532009855))
            ThreePointArc((-0.9883749956, -3.2532009855), (-1.3178396431, -3.2974811593), (-1.5000564258, -3.5755229349))
            ThreePointArc((-1.5000564258, -3.5755229349), (-1.6685571025, -3.8793255231), (-1.994322, -4.000014))
            Line((-1.994322, -4.000014), (-3.500056, -4.000014))
            ThreePointArc((-3.500056, -4.000014), (-3.8536093906, -3.8535673906), (-4.000056, -3.500014))
            Line((-4.000056, -3.500014), (-4.000056, -1.99428))
            ThreePointArc((-4.000056, -1.99428), (-3.8793675231, -1.6685151025), (-3.5755649263, -1.5000144822))
            ThreePointArc((-3.5755649263, -1.5000144822), (-3.2975231593, -1.3177976431), (-3.2532441585, -0.9883290481))
            ThreePointArc((-3.2532441585, -0.9883290481), (-3.400056, -1.4e-05), (-3.2532429855, 0.9883049956))
            ThreePointArc((-3.2532429855, 0.9883049956), (-3.2975231593, 1.3177696431), (-3.5755649349, 1.4999864258))
            ThreePointArc((-3.5755649349, 1.4999864258), (-3.8793675231, 1.6684871025), (-4.000056, 1.994252))
            Line((-4.000056, 1.994252), (-4.000056, 3.499986))
            ThreePointArc((-4.000056, 3.499986), (-3.8536093906, 3.8535393906), (-3.500056, 3.999986))
            Line((-3.500056, 3.999986), (-1.994322, 3.999986))
            ThreePointArc((-1.994322, 3.999986), (-1.6685571025, 3.8792975231), (-1.5000564822, 3.5754949263))
            ThreePointArc((-1.5000564822, 3.5754949263), (-1.3178396431, 3.2974531593), (-0.9883710481, 3.2531741585))
            ThreePointArc((-0.9883710481, 3.2531741585), (-5.6e-05, 3.399986), (0.9882629956, 3.2531729855))
            ThreePointArc((0.9882629956, 3.2531729855), (1.3177276431, 3.2974531593), (1.4999444258, 3.5754949349))
            ThreePointArc((1.4999444258, 3.5754949349), (1.6684451025, 3.8792975231), (1.99421, 3.999986))
            Line((1.99421, 3.999986), (3.499944, 3.999986))
            ThreePointArc((3.499944, 3.999986), (3.8534973906, 3.8535393906), (3.999944, 3.499986))
            Line((3.999944, 3.499986), (3.999944, 1.994252))
            ThreePointArc((3.999944, 1.994252), (3.8792555231, 1.6684871025), (3.5754529263, 1.4999864822))
            ThreePointArc((3.5754529263, 1.4999864822), (3.2974111593, 1.3177696431), (3.2531321585, 0.9883010481))
            ThreePointArc((3.2531321585, 0.9883010481), (3.399944, -1.4e-05), (3.2531309855, -0.9883329956))
            ThreePointArc((3.2531309855, -0.9883329956), (3.2974111593, -1.3177976431), (3.5754529349, -1.5000144258))
            ThreePointArc((3.5754529349, -1.5000144258), (3.8792555231, -1.6685151025), (3.999944, -1.99428))
            Line((3.999944, -1.99428), (3.999944, -3.500014))
            ThreePointArc((3.999944, -3.500014), (3.8534973906, -3.8535673906), (3.499944, -4.000014))
            Line((3.499944, -4.000014), (1.99421, -4.000014))
            ThreePointArc((1.99421, -4.000014), (1.6684451025, -3.8793255231), (1.4999444822, -3.5755229263))
            ThreePointArc((1.4999444822, -3.5755229263), (1.3177276431, -3.2974811593), (0.9882629956, -3.2532009855))
        make_face(mode=Mode.SUBTRACT)
        with BuildLine():
            ThreePointArc((11.3421941215, 9.5478376661), (9.8734155063, 9.8734575063), (9.5477956661, 11.3422361215))
            Line((9.5477956661, 11.3422361215), (9.914528, 12.349824))
            ThreePointArc((9.914528, 12.349824), (13.0434468843, 13.0434888843), (12.3497820253, 9.9145699306))
            Line((12.3497820253, 9.9145699306), (11.3421941215, 9.5478376661))
        make_face(mode=Mode.SUBTRACT)
    extrude(amount=F2_DEPTH, both=True)


solid = f2.part
